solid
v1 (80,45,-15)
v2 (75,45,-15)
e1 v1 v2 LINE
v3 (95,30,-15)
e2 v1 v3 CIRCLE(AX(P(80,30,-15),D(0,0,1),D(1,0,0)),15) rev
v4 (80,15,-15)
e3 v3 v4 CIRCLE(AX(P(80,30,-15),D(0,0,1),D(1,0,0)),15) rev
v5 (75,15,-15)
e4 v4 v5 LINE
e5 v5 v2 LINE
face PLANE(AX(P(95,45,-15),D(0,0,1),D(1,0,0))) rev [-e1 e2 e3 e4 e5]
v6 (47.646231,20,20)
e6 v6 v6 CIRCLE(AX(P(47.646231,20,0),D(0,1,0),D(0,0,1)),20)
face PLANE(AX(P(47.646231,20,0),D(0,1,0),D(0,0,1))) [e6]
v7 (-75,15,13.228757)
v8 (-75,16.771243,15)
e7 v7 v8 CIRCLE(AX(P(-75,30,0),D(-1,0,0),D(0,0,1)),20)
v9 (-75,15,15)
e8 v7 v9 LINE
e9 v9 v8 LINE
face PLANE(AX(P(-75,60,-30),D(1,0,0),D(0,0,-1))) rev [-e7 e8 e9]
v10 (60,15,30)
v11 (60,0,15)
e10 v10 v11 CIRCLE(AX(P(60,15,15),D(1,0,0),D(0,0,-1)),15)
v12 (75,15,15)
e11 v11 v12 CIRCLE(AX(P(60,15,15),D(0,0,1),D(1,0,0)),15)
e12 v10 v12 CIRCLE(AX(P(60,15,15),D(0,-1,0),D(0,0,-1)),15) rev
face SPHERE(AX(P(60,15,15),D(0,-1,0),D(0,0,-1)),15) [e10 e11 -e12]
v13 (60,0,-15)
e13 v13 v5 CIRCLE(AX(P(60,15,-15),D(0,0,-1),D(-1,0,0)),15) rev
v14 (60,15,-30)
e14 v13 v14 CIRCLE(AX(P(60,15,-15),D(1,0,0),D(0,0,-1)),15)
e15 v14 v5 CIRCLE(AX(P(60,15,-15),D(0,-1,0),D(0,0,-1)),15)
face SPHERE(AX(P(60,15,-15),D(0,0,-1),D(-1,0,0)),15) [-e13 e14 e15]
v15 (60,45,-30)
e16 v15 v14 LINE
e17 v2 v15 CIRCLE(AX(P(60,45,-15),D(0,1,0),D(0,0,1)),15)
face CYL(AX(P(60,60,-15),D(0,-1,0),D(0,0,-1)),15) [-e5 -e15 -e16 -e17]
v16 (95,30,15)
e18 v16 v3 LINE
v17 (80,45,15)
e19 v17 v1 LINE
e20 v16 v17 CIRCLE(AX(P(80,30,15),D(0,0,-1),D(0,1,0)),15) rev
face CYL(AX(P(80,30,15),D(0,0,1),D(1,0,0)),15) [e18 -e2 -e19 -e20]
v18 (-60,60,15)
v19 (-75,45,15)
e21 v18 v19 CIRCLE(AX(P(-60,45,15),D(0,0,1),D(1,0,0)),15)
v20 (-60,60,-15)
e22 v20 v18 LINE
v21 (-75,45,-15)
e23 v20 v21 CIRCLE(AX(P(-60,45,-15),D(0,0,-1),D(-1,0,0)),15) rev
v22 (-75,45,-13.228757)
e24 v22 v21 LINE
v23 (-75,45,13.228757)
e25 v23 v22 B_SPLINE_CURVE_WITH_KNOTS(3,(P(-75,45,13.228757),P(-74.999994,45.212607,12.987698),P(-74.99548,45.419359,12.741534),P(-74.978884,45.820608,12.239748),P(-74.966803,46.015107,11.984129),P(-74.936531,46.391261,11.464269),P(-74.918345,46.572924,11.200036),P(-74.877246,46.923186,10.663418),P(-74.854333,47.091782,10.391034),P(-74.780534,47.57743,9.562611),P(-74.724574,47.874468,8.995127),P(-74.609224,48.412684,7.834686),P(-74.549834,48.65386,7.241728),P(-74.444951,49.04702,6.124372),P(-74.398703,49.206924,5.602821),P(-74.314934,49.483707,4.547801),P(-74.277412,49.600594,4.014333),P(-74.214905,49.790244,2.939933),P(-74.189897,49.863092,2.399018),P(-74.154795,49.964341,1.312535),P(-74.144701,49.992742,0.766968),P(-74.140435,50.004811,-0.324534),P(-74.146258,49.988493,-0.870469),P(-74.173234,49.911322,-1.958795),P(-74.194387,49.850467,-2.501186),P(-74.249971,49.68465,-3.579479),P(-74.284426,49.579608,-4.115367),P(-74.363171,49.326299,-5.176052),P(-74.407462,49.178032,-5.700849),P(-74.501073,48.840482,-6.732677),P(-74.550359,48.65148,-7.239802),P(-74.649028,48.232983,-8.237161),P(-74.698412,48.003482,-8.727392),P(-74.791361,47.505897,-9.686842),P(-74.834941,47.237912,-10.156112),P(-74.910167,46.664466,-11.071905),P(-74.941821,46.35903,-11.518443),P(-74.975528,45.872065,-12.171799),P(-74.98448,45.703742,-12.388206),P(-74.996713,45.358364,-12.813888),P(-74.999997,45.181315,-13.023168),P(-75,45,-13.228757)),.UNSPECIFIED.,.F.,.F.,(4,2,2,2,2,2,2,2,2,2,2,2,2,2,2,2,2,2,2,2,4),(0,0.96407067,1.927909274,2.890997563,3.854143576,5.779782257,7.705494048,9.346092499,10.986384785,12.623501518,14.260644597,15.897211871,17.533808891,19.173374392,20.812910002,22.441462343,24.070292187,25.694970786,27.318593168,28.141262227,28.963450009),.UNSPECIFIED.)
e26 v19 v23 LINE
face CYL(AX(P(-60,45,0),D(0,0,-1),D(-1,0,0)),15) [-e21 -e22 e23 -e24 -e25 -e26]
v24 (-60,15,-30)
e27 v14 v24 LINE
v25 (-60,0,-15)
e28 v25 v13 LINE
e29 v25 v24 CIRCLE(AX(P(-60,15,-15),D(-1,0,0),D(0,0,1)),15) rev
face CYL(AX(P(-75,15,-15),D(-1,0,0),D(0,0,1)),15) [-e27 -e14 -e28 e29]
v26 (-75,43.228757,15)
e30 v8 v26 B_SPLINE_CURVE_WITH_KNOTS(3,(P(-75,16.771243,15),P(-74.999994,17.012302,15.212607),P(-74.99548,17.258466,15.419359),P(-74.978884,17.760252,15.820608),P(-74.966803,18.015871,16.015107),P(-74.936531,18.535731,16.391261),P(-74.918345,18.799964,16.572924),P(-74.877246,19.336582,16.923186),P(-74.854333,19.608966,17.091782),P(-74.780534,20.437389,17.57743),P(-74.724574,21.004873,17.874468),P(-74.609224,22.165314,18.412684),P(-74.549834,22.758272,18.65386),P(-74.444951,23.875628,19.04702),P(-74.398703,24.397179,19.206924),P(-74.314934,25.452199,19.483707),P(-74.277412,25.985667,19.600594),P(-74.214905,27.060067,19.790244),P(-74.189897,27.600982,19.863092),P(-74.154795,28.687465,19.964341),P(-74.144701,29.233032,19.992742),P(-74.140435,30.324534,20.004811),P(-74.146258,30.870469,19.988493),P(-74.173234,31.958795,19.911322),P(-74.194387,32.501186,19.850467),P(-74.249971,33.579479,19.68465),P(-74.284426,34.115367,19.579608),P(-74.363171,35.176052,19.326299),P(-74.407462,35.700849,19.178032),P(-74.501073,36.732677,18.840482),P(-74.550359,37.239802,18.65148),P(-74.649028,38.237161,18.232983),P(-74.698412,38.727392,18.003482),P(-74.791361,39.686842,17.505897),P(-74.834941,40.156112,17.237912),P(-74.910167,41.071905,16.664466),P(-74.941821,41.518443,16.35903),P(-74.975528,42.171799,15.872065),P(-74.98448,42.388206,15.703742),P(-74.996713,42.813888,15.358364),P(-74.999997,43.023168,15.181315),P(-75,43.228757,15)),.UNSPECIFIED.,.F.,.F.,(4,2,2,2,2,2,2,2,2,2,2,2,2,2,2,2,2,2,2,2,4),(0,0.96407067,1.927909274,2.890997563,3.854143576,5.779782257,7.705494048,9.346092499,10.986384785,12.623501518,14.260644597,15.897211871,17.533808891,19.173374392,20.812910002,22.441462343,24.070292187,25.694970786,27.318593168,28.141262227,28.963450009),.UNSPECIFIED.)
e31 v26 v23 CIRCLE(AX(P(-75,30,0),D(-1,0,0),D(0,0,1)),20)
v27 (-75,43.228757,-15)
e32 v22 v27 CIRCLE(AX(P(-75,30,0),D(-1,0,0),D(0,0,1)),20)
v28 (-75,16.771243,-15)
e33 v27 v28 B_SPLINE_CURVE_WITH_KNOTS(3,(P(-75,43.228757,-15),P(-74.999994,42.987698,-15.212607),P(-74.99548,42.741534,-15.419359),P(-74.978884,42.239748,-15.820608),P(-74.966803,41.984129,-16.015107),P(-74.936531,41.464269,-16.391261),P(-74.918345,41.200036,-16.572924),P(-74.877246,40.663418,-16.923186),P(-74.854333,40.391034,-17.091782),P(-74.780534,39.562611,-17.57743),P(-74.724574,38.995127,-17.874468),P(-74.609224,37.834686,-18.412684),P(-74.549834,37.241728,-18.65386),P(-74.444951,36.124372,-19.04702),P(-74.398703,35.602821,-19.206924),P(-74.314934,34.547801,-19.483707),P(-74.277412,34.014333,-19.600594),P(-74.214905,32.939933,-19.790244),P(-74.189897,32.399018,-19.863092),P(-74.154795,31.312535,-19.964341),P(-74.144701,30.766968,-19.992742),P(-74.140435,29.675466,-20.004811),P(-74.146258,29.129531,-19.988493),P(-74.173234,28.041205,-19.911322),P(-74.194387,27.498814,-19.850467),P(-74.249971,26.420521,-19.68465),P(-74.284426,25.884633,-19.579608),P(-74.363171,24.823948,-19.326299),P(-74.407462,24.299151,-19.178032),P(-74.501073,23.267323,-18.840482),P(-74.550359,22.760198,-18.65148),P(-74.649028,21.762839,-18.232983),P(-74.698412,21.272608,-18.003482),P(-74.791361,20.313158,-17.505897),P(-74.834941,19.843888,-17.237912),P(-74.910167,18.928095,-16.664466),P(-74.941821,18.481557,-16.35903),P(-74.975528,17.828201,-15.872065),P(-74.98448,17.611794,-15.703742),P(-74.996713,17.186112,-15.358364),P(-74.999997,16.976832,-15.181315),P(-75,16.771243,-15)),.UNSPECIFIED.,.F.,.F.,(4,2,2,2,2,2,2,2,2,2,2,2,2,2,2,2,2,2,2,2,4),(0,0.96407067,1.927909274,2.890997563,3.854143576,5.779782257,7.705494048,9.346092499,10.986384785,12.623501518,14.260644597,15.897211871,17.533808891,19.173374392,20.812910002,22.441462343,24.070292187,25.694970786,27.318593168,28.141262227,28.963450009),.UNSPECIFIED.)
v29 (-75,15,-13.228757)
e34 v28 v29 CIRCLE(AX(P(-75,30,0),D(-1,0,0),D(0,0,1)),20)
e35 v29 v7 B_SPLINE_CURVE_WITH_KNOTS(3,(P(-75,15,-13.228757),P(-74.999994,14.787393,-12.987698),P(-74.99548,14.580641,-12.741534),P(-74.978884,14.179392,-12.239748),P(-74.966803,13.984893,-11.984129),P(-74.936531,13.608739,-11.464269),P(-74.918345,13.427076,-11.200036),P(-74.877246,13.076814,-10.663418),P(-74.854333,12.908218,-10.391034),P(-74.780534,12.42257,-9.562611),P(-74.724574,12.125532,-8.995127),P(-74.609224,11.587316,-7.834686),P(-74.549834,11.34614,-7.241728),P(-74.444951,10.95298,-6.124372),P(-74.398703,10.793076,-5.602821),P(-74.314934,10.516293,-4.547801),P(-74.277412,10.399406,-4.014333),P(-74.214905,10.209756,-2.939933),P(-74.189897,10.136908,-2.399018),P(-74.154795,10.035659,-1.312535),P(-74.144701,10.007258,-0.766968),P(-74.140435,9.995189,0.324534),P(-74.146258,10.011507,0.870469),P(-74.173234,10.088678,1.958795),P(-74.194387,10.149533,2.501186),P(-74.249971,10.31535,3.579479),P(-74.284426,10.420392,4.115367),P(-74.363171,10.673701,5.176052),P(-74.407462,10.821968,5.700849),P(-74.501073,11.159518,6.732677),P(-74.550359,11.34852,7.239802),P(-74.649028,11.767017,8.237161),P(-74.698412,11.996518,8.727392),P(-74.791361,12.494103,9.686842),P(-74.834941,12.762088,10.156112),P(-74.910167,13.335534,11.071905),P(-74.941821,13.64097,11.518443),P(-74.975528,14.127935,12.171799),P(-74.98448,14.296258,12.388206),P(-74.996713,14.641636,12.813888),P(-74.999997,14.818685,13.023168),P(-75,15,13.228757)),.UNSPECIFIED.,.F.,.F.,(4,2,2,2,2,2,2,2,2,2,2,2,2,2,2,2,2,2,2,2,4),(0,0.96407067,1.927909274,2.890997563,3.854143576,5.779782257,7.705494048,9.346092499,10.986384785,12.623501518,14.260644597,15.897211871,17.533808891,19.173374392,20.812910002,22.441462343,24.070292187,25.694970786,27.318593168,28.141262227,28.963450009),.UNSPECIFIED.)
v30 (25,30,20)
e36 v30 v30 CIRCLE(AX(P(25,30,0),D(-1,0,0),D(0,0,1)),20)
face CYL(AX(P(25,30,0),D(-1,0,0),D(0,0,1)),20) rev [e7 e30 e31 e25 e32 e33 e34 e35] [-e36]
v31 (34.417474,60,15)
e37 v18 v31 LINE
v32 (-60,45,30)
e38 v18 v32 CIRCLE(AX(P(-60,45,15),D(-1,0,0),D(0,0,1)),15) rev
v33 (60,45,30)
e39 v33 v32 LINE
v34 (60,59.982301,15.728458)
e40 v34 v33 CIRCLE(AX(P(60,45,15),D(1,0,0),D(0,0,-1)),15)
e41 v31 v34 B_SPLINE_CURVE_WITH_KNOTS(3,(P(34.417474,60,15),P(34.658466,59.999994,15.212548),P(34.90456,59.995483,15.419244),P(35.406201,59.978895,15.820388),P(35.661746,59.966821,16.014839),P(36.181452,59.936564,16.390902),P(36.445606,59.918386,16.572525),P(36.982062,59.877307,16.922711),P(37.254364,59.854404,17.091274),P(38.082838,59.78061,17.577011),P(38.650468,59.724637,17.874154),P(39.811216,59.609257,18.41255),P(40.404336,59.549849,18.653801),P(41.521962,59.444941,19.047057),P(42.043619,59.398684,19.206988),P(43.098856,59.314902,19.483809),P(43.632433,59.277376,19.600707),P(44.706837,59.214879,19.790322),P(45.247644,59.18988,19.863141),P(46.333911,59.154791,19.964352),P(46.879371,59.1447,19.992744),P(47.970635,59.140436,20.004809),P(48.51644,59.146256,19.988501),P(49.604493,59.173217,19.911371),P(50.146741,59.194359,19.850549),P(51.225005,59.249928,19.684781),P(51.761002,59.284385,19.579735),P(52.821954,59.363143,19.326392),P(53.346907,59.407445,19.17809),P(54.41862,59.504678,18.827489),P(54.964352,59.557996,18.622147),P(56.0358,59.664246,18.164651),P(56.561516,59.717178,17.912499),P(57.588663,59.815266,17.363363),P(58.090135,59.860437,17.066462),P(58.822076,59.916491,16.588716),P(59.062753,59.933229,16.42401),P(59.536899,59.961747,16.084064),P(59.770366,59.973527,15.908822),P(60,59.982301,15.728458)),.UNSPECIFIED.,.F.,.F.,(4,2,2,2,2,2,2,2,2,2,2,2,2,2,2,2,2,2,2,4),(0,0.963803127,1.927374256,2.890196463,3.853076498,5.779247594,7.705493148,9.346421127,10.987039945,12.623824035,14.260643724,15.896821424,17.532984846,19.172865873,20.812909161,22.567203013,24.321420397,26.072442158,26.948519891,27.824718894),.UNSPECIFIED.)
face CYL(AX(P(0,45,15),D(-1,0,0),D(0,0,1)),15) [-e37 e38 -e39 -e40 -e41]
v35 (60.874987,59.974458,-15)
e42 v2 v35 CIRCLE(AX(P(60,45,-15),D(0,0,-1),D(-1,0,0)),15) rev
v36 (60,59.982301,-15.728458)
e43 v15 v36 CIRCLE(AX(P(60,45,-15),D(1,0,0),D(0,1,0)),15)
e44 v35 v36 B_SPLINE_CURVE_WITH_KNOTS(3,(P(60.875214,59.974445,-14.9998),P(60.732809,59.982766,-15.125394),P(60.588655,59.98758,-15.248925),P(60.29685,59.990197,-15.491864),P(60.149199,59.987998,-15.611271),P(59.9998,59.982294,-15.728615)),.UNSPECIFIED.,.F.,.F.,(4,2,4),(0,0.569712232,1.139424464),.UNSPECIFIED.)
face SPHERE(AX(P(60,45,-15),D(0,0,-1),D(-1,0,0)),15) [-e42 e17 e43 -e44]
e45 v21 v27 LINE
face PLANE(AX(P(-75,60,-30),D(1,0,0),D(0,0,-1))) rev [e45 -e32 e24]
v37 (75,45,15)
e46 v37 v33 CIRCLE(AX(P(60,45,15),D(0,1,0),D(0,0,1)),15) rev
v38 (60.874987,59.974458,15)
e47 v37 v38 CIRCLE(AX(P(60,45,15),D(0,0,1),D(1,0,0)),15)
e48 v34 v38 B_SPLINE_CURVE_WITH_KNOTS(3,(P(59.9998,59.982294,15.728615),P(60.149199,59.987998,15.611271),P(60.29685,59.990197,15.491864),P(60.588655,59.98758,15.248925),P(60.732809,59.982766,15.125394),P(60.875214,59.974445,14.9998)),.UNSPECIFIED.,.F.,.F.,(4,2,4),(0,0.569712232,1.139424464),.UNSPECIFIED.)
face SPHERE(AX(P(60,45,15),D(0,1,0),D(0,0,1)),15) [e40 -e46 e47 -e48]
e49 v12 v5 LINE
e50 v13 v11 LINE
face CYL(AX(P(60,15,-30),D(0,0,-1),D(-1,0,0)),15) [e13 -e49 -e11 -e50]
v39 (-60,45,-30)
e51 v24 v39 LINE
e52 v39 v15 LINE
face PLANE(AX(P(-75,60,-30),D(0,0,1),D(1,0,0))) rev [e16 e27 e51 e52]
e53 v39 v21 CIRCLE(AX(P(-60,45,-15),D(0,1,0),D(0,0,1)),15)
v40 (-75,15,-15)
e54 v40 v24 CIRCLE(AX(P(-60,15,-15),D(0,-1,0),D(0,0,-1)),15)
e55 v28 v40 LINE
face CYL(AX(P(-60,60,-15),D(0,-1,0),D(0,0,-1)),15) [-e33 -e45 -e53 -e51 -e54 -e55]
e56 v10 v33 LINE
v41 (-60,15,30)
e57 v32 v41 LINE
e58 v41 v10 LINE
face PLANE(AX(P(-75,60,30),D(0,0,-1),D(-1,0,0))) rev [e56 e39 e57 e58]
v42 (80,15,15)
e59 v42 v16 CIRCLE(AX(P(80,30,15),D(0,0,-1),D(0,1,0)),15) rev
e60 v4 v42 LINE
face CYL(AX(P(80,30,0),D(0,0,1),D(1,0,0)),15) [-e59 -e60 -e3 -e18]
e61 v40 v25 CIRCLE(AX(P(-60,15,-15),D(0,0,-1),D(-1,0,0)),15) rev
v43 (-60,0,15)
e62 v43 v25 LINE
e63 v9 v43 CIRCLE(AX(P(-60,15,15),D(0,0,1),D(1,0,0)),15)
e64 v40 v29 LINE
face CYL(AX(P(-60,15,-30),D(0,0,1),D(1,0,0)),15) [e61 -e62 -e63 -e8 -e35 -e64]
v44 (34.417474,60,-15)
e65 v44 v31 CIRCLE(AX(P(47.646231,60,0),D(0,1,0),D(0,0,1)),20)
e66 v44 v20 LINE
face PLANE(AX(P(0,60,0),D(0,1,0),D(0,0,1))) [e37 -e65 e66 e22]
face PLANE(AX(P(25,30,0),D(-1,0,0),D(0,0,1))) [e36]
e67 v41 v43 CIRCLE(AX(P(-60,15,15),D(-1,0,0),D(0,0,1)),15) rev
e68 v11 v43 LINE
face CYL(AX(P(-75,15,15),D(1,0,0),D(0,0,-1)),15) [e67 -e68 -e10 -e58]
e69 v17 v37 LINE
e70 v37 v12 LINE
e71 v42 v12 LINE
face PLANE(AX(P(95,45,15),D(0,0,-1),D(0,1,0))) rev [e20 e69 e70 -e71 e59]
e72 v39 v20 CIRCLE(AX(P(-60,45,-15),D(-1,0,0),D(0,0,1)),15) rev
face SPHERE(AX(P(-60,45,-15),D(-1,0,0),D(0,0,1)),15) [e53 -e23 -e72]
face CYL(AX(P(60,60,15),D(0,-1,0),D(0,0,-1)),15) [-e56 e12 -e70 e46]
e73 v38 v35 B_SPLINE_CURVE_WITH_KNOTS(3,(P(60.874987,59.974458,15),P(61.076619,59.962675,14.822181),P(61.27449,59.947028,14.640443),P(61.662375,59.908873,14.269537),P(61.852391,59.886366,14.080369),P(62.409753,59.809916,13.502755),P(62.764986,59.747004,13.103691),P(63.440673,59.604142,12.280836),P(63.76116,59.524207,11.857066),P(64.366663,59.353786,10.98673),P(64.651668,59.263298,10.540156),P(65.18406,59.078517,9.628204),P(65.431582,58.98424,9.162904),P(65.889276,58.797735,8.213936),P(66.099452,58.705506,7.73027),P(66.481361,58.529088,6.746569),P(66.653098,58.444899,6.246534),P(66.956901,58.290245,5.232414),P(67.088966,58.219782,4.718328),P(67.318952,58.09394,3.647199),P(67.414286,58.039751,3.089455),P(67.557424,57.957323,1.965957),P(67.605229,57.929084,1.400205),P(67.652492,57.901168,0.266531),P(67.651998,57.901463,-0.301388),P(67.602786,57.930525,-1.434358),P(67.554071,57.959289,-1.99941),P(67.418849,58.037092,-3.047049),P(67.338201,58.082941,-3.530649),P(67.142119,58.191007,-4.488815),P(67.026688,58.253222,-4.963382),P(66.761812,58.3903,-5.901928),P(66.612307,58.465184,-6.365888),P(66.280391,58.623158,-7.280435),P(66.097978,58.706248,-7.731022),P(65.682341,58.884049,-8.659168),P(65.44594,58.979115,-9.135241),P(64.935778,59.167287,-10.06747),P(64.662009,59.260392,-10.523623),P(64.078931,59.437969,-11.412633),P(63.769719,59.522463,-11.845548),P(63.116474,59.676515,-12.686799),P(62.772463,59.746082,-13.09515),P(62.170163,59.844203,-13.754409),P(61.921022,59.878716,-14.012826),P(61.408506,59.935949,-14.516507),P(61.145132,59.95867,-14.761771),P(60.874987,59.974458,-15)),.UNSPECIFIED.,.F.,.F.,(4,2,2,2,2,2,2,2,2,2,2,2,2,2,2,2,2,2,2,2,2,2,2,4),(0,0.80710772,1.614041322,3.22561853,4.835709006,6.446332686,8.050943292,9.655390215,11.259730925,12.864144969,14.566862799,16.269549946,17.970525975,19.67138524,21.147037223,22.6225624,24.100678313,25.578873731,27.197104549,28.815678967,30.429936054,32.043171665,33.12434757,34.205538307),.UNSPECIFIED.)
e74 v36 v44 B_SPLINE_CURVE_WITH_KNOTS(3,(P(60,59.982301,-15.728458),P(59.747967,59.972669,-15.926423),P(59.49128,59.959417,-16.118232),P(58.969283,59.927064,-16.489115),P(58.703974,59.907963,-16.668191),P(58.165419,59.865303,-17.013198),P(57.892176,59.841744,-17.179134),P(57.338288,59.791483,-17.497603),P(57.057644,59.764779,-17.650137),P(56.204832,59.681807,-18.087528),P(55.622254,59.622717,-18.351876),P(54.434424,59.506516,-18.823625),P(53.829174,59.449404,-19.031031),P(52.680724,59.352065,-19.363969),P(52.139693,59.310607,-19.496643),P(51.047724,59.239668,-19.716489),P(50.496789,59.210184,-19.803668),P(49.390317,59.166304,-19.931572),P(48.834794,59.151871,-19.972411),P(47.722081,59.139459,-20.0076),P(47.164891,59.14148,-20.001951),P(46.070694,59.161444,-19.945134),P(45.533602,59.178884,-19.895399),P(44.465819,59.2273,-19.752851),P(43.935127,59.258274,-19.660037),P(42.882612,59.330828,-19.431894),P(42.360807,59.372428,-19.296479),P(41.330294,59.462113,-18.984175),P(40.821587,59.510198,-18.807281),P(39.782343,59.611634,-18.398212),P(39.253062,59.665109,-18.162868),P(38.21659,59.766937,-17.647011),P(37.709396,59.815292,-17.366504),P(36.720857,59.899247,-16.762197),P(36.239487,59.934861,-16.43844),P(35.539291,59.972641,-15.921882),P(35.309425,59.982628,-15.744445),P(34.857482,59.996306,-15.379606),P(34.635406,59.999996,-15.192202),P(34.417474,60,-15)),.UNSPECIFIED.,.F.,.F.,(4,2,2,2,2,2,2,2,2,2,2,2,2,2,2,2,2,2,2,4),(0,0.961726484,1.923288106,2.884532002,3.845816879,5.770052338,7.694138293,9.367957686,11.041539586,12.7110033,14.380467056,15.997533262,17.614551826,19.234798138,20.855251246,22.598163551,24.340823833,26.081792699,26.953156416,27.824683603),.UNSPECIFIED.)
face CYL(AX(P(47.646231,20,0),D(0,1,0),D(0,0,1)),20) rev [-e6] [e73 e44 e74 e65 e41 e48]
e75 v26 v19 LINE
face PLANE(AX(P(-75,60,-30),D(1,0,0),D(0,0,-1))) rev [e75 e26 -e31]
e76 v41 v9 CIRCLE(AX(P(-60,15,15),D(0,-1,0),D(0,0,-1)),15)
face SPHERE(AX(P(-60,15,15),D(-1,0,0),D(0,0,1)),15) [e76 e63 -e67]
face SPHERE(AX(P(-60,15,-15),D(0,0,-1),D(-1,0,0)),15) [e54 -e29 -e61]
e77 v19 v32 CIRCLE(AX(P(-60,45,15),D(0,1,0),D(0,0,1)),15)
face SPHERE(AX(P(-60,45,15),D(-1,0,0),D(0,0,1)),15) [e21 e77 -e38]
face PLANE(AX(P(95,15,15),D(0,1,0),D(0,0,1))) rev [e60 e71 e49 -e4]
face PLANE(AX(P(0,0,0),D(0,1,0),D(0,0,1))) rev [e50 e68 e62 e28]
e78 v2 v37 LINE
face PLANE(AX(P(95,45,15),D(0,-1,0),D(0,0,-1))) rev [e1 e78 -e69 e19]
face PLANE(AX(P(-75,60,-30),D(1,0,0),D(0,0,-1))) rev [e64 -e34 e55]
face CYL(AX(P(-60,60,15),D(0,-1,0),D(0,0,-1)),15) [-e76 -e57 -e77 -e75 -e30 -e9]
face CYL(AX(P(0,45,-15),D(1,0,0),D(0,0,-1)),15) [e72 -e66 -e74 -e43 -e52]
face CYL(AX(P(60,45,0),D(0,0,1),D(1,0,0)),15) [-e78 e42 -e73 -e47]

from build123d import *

# Parameters (mm, degrees)
SKETCH1_W           = 150
SKETCH1_H           = 60
BOSS_EXTRUDE3_DEPTH = 60
SKETCH3_R           = 20
CUT_EXTRUDE1_DEPTH  = 100
FILLET1_R           = 15
SKETCH5_R           = 20
CUT_EXTRUDE2_DEPTH  = 40
SKETCH6_W           = 30
SKETCH6_H           = 30
BOSS_EXTRUDE4_DEPTH = 20
FILLET4_R           = 15
FILLET5_R           = 15


# Some blends are built 0.0001 mm under size
with BuildPart() as part:
    # Sketch1 → Boss-Extrude3 (new body)
    with BuildSketch(Plane(origin=(0, 0, 0), x_dir=(1, 0, 0), z_dir=(0, 1, 0))):
        Rectangle(SKETCH1_W, SKETCH1_H)
    extrude(amount=BOSS_EXTRUDE3_DEPTH)

    # Sketch3 → Cut-Extrude1 (cut)
    with BuildSketch(Plane.ZY.offset(75)):
        with Locations((0, 30)):
            Circle(SKETCH3_R)
    extrude(amount=-CUT_EXTRUDE1_DEPTH, mode=Mode.SUBTRACT)

    # Fillet1
    # the kernel refuses this fillet: 15 mm, written as the material it takes off along each edge
    with BuildSketch(Plane(origin=(-60, 45, 15), x_dir=(0, 1, 0), z_dir=(-1, 0, 0))) as fillet1_piece_1_section:
        Polygon((0, 0), (FILLET1_R, 0), (FILLET1_R, -FILLET1_R), (0, -FILLET1_R), align=None)
    fillet1_piece_1 = extrude(amount=FILLET1_R, mode=Mode.PRIVATE)
    fillet1_piece_1 = fillet1_piece_1 - Plane(origin=(-60, 45, 15), x_dir=(0, -0.7071067811865475, -0.7071067811865475), z_dir=(-1, 0, 0)) * Sphere(FILLET1_R, mode=Mode.PRIVATE)
    add(fillet1_piece_1, mode=Mode.SUBTRACT)
    with BuildSketch(Plane(origin=(-60, 45, -15), x_dir=(-1, 0, 0), z_dir=(0, 0, -1))) as fillet1_piece_2_section:
        Polygon((0, 0), (FILLET1_R, 0), (FILLET1_R, FILLET1_R), (0, FILLET1_R), align=None)
    fillet1_piece_2 = extrude(amount=FILLET1_R, mode=Mode.PRIVATE)
    fillet1_piece_2 = fillet1_piece_2 - Plane(origin=(-60, 45, -15), x_dir=(0.7071067811865475, -0.7071067811865475, 0), z_dir=(0, 0, -1)) * Sphere(FILLET1_R, mode=Mode.PRIVATE)
    add(fillet1_piece_2, mode=Mode.SUBTRACT)
    with BuildSketch(Plane(origin=(60, 45, 15), x_dir=(0, 1, 0), z_dir=(1, 0, 0))) as fillet1_piece_3_section:
        Polygon((0, 0), (FILLET1_R, 0), (FILLET1_R, FILLET1_R), (0, FILLET1_R), align=None)
    fillet1_piece_3 = extrude(amount=FILLET1_R, mode=Mode.PRIVATE)
    fillet1_piece_3 = fillet1_piece_3 - Plane(origin=(60, 45, 15), x_dir=(0, -0.7071067811865475, -0.7071067811865475), z_dir=(1, 0, 0)) * Sphere(FILLET1_R, mode=Mode.PRIVATE)
    add(fillet1_piece_3, mode=Mode.SUBTRACT)
    with BuildSketch(Plane(origin=(60, 45, -15), x_dir=(1, 0, 0), z_dir=(0, 0, -1))) as fillet1_piece_4_section:
        Polygon((0, 0), (FILLET1_R, 0), (FILLET1_R, -FILLET1_R), (0, -FILLET1_R), align=None)
    fillet1_piece_4 = extrude(amount=FILLET1_R, mode=Mode.PRIVATE)
    fillet1_piece_4 = fillet1_piece_4 - Plane(origin=(60, 45, -15), x_dir=(-0.7071067811865475, -0.7071067811865475, 0), z_dir=(0, 0, -1)) * Sphere(FILLET1_R, mode=Mode.PRIVATE)
    add(fillet1_piece_4, mode=Mode.SUBTRACT)
    with BuildSketch(Plane(origin=(60, 15, 15), x_dir=(0, -1, 0), z_dir=(1, 0, 0))) as fillet1_piece_5_section:
        Polygon((0, 0), (FILLET1_R, 0), (FILLET1_R, -FILLET1_R), (0, -FILLET1_R), align=None)
    fillet1_piece_5 = extrude(amount=FILLET1_R, mode=Mode.PRIVATE)
    fillet1_piece_5 = fillet1_piece_5 - Plane(origin=(60, 15, 15), x_dir=(0, 0.7071067811865475, -0.7071067811865475), z_dir=(1, 0, 0)) * Sphere(FILLET1_R, mode=Mode.PRIVATE)
    add(fillet1_piece_5, mode=Mode.SUBTRACT)
    with BuildSketch(Plane(origin=(-60, 15, 15), x_dir=(0, -1, 0), z_dir=(-1, 0, 0))) as fillet1_piece_6_section:
        Polygon((0, 0), (FILLET1_R, 0), (FILLET1_R, FILLET1_R), (0, FILLET1_R), align=None)
    fillet1_piece_6 = extrude(amount=FILLET1_R, mode=Mode.PRIVATE)
    fillet1_piece_6 = fillet1_piece_6 - Plane(origin=(-60, 15, 15), x_dir=(0, 0.7071067811865475, -0.7071067811865475), z_dir=(-1, 0, 0)) * Sphere(FILLET1_R, mode=Mode.PRIVATE)
    add(fillet1_piece_6, mode=Mode.SUBTRACT)
    with BuildSketch(Plane(origin=(-60, 15, -15), x_dir=(-1, 0, 0), z_dir=(0, 0, -1))) as fillet1_piece_7_section:
        Polygon((0, 0), (FILLET1_R, 0), (FILLET1_R, -FILLET1_R), (0, -FILLET1_R), align=None)
    fillet1_piece_7 = extrude(amount=FILLET1_R, mode=Mode.PRIVATE)
    fillet1_piece_7 = fillet1_piece_7 - Plane(origin=(-60, 15, -15), x_dir=(0.7071067811865475, 0.7071067811865475, 0), z_dir=(0, 0, -1)) * Sphere(FILLET1_R, mode=Mode.PRIVATE)
    add(fillet1_piece_7, mode=Mode.SUBTRACT)
    with BuildSketch(Plane(origin=(60, 15, -15), x_dir=(1, 0, 0), z_dir=(0, 0, -1))) as fillet1_piece_8_section:
        Polygon((0, 0), (FILLET1_R, 0), (FILLET1_R, FILLET1_R), (0, FILLET1_R), align=None)
    fillet1_piece_8 = extrude(amount=FILLET1_R, mode=Mode.PRIVATE)
    fillet1_piece_8 = fillet1_piece_8 - Plane(origin=(60, 15, -15), x_dir=(-0.7071067811865475, 0.7071067811865475, 0), z_dir=(0, 0, -1)) * Sphere(FILLET1_R, mode=Mode.PRIVATE)
    add(fillet1_piece_8, mode=Mode.SUBTRACT)
    with BuildSketch(Plane(origin=(-75, 60, 15), x_dir=(0, -1, 0), z_dir=(0, 0, -1)), Plane(origin=(75, 60, -15), x_dir=(0, -1, 0), z_dir=(0, 0, 1)), Plane(origin=(-75, 15, 30), x_dir=(0, 0, -1), z_dir=(0, 1, 0)), Plane(origin=(-75, 15, -30), x_dir=(1, 0, 0), z_dir=(0, 1, 0))) as fillet1_piece_9:
        with BuildLine():
            CenterArc((FILLET1_R, -FILLET1_R), FILLET1_R, 90, 90)
            Line((0, -FILLET1_R), (0, 0))
            Line((0, 0), (FILLET1_R, 0))
        make_face()
    extrude(amount=30, mode=Mode.SUBTRACT)
    with BuildSketch(Plane(origin=(60, 60, 30), x_dir=(0, 0, -1), z_dir=(-1, 0, 0)), Plane(origin=(-60, 0, -30), x_dir=(0, 1, 0), z_dir=(1, 0, 0))) as fillet1_piece_10:
        with BuildLine():
            CenterArc((FILLET1_R, FILLET1_R), FILLET1_R, 180, 90)
            Line((0, FILLET1_R), (0, 0))
            Line((0, 0), (FILLET1_R, 0))
        make_face()
    extrude(amount=120, mode=Mode.SUBTRACT)
    with BuildSketch(Plane(origin=(60, 0, 30), x_dir=(0, 0, -1), z_dir=(-1, 0, 0)), Plane(origin=(-60, 60, -30), x_dir=(0, -1, 0), z_dir=(1, 0, 0))) as fillet1_piece_11:
        with BuildLine():
            CenterArc((FILLET1_R, -FILLET1_R), FILLET1_R, 90, 90)
            Line((0, -FILLET1_R), (0, 0))
            Line((0, 0), (FILLET1_R, 0))
        make_face()
    extrude(amount=120, mode=Mode.SUBTRACT)
    with BuildSketch(Plane(origin=(-75, 0, 15), x_dir=(0, 1, 0), z_dir=(0, 0, -1)), Plane(origin=(75, 0, -15), x_dir=(0, 1, 0), z_dir=(0, 0, 1)), Plane(origin=(75, 15, 30), x_dir=(0, 0, -1), z_dir=(0, 1, 0)), Plane(origin=(75, 15, -30), x_dir=(-1, 0, 0), z_dir=(0, 1, 0))) as fillet1_piece_12:
        with BuildLine():
            CenterArc((FILLET1_R, FILLET1_R), FILLET1_R, 180, 90)
            Line((0, FILLET1_R), (0, 0))
            Line((0, 0), (FILLET1_R, 0))
        make_face()
    extrude(amount=30, mode=Mode.SUBTRACT)

    # Sketch5 → Cut-Extrude2 (cut)
    with BuildSketch(Plane(origin=(0, 60, 0), x_dir=(1, 0, 0), z_dir=(0, 1, 0))):
        with Locations(Location((47.646230656, 0, 0), (0, 0, 270))):
            Circle(SKETCH5_R)
    extrude(amount=-CUT_EXTRUDE2_DEPTH, mode=Mode.SUBTRACT)

    # Sketch6 → Boss-Extrude4 (add)
    with BuildSketch(Plane(origin=(75, 0, 0), x_dir=(0, 0, -1), z_dir=(1, 0, 0))):
        with Locations((0, 30)):
            Rectangle(SKETCH6_W, SKETCH6_H)
    extrude(amount=BOSS_EXTRUDE4_DEPTH)

    # Fillet4
    fillet4_edges = [part.edges().sort_by_distance(p)[0] for p in [
        (95, 15, 0),
    ]]
    fillet(fillet4_edges, radius=FILLET4_R)

    # Fillet5
    fillet5_edges = [part.edges().sort_by_distance(p)[0] for p in [
        (95, 45, 0),
    ]]
    fillet(fillet5_edges, radius=FILLET5_R - 0.0001)  # a hair under: the kernel refuses the full size


solid = part.part
